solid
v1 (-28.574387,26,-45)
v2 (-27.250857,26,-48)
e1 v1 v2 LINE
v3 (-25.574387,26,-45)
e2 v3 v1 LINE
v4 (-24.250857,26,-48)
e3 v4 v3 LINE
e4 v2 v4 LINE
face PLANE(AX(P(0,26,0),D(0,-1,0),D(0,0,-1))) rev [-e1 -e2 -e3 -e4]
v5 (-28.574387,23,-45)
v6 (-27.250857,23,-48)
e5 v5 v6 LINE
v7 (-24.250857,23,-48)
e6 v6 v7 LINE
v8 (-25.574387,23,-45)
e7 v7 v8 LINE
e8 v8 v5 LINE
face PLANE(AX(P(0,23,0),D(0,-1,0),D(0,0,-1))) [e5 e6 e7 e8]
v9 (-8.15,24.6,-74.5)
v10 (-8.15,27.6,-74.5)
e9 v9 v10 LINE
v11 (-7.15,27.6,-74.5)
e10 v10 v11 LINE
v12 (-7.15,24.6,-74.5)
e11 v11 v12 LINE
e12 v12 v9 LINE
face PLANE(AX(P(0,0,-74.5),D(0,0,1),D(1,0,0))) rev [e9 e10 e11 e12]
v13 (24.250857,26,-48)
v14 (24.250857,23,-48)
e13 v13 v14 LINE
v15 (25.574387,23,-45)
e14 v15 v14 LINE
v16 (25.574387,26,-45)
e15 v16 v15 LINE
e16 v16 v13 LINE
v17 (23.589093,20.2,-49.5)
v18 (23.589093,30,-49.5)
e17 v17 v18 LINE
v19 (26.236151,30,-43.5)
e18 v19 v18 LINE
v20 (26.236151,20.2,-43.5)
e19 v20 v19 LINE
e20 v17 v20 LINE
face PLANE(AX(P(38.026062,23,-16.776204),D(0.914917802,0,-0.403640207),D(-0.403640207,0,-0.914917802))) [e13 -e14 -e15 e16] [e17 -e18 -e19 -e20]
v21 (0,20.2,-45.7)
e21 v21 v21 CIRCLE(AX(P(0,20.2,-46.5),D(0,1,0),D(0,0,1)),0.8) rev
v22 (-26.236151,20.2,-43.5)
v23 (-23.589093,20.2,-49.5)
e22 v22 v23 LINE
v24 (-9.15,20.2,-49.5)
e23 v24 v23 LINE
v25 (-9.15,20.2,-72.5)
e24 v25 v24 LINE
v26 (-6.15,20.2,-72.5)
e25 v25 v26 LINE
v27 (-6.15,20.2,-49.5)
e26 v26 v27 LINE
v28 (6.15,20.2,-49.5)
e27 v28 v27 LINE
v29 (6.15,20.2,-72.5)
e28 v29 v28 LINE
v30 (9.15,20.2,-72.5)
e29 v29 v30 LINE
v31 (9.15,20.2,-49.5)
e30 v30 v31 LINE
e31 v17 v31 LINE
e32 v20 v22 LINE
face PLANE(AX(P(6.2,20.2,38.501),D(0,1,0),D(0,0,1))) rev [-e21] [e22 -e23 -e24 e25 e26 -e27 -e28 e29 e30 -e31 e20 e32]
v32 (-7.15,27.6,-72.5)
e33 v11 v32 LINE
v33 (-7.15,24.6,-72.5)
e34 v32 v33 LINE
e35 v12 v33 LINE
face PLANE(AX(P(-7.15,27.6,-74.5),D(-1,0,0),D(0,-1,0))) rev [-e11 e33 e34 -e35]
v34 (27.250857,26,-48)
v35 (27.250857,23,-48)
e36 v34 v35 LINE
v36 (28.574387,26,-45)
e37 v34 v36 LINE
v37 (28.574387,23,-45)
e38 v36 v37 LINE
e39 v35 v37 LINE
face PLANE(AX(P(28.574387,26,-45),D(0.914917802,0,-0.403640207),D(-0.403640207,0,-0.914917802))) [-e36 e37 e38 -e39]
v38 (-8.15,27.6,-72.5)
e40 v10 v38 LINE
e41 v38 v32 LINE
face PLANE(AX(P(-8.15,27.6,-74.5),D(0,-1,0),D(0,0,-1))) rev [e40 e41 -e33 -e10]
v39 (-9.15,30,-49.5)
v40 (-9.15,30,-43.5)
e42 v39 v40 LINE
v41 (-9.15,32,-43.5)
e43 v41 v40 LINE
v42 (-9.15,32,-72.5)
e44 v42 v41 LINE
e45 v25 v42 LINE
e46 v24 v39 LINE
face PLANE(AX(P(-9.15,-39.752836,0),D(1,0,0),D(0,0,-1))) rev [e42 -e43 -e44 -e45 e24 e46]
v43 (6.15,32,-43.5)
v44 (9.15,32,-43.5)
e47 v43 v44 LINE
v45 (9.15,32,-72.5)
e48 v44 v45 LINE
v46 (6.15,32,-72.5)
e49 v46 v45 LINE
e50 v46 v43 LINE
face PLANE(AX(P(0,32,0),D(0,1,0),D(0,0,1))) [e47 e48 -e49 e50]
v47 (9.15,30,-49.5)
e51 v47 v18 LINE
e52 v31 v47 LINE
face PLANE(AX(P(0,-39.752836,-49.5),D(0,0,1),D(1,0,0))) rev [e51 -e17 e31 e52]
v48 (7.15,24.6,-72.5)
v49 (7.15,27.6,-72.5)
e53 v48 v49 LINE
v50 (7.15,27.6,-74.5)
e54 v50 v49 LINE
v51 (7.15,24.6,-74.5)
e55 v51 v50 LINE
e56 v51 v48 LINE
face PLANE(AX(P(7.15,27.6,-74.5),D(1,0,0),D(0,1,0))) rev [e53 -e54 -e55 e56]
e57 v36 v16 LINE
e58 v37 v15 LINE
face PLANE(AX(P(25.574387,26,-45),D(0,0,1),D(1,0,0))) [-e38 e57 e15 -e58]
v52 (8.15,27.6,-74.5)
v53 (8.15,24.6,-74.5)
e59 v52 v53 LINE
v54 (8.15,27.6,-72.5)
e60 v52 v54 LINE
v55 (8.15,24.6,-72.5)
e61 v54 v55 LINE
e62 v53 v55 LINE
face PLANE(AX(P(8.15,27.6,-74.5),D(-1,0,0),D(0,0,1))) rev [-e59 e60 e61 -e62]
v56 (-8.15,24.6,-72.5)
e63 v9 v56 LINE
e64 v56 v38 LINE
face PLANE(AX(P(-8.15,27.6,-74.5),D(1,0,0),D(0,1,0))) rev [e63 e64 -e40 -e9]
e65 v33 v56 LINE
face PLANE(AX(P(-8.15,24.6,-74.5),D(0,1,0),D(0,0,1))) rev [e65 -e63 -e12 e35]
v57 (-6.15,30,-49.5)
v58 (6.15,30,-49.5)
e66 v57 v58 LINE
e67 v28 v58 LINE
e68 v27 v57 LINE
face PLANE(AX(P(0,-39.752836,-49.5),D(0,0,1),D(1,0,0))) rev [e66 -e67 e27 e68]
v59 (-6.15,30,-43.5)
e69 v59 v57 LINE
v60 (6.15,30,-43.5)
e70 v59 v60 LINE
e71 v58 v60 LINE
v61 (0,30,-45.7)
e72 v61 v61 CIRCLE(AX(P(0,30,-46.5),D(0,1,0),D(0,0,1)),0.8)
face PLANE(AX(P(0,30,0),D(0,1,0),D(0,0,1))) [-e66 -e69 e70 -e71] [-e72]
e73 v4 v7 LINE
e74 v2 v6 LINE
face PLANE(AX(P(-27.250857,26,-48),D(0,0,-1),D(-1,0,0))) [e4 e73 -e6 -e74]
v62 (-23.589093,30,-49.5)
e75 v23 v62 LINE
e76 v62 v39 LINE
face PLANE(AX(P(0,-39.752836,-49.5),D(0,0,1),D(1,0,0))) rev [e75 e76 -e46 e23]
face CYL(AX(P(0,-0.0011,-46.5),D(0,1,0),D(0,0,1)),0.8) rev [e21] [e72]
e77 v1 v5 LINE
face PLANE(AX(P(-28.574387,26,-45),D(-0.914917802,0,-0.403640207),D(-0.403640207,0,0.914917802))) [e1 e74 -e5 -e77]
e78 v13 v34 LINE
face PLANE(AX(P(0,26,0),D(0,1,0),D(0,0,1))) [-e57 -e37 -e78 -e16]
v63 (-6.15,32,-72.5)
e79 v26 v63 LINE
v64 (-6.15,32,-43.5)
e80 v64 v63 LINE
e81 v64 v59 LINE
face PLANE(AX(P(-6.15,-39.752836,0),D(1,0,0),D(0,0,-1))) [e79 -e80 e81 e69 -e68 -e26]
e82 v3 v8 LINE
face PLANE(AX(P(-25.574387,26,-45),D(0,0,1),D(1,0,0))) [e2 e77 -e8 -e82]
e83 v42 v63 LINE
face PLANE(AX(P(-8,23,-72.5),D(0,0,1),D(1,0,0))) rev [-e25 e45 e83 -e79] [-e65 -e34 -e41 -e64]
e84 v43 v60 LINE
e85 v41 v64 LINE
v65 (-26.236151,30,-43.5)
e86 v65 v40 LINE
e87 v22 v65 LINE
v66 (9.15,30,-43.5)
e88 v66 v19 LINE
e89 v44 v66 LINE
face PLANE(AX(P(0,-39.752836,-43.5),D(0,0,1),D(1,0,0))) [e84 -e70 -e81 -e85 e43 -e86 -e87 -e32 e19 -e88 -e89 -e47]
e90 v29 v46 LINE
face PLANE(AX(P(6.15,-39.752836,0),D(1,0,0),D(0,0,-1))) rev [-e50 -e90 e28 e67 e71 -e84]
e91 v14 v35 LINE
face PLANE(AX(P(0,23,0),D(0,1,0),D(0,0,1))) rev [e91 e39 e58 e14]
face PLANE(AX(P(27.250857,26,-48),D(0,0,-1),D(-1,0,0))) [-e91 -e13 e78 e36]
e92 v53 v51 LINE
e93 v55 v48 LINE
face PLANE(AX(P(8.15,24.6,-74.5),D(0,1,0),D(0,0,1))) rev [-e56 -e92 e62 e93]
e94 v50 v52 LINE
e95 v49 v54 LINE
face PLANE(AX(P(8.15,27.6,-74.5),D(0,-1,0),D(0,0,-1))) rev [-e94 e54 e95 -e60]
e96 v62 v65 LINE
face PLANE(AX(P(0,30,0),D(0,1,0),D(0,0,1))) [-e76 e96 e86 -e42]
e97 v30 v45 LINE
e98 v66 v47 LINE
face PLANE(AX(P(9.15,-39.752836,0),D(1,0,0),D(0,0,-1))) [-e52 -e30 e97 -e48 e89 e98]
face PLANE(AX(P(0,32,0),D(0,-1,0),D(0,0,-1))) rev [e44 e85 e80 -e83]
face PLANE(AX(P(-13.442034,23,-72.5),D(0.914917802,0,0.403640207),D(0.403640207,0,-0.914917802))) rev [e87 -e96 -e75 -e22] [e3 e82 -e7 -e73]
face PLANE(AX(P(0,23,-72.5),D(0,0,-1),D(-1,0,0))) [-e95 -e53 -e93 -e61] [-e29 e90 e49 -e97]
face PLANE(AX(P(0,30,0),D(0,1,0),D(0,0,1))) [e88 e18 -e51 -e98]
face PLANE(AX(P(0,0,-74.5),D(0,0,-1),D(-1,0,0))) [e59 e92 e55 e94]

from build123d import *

# Parameters (mm, degrees)
SKETCH1_W                = 58
SKETCH1_H                = 65
BOSS_EXTRUDE1_DEPTH      = 30
BOSS_EXTRUDE3_REACH      = 92.09
SKETCH10_W               = 5
SKETCH10_H               = 14
CUT_EXTRUDE1_REACH       = 111.372
SKETCH2_R                = 2.45
SKETCH2_R_2              = 2.55
CUT_EXTRUDE2_REACH       = 91.744
SKETCH3_W                = 12.4
SKETCH3_H                = 10.4
SKETCH11_W               = 3
SKETCH11_H               = 2
BOSS_EXTRUDE4_DEPTH      = 6.3
FILLET3_R                = 1.5
SKETCH12_R               = 0.5
CUT_EXTRUDE3_DEPTH       = 92.15338732
FILLET3_OF_MIRROR1_R     = 1.5
BOSS_EXTRUDE5_REACH      = 111.564
SKETCH13_W               = 15
SKETCH13_H               = 6
BOSS_EXTRUDE6_REACH      = 111.564
SKETCH17_W               = 15
SKETCH17_H               = 14
CUT_EXTRUDE18_REACH      = 129.651
SKETCH35_W               = 16
SKETCH35_H               = 6
FILLET5_R                = 3
BOSS_EXTRUDE7_START      = 20.2
BOSS_EXTRUDE7_DEPTH      = 9.8
BOSS_EXTRUDE8_DEPTH      = 20
CUT_EXTRUDE15_REACH      = 95.637
SKETCH28_R               = 0.8
FILLET4_R                = 3
CUT_EXTRUDE16_REACH      = 96.767
SKETCH29_R               = 1.6
SKETCH30_W               = 14
SKETCH30_H               = 1.5
BOSS_EXTRUDE9_DEPTH      = 6.1
SKETCH31_W               = 1.3
SKETCH31_H               = 14
BOSS_EXTRUDE10_DEPTH     = 5
CUT_EXTRUDE17_REACH      = 99.736
FILLET11_R               = 1
FILLET11_OF_MIRROR4_R    = 1
MIRROR5_START            = 2.5
MIRROR5_OUTLINE_W        = 1.5
MIRROR5_OUTLINE_H        = 14
MIRROR5_DEPTH            = 6.1
MIRROR5_START_2          = 7.3
MIRROR5_2_DEPTH          = 1.3
SKETCH36_W               = 22.4
SKETCH36_H               = 14.8
BOSS_EXTRUDE12_DEPTH     = 14
CUT_EXTRUDE19_DEPTH      = 3
CUT_EXTRUDE20_DEPTH      = 11
CUT_EXTRUDE21_REACH      = 101.088
SKETCH41_W               = 3
SKETCH41_H               = 35
BOSS_EXTRUDE13_DEPTH     = 2
BOSS_EXTRUDE14_START     = -1.789079
SKETCH43_W               = 36.284482562
SKETCH43_H               = 9.6
BOSS_EXTRUDE14_DEPTH     = 66.789079
BOSS_EXTRUDE15_REACH     = 152.996
SKETCH44_W               = 2.842240903
SKETCH44_H               = 50
FILLET6_R                = 8
FILLET7_R                = 5
SKETCH45_W               = 17
SKETCH45_H               = 8
CUT_EXTRUDE22_DEPTH      = 166.644015889
BOSS_EXTRUDE16_REACH     = 152.29
SKETCH46_W               = 4.5
SKETCH46_H               = 5
BOSS_EXTRUDE17_REACH     = 154.715
SKETCH49_W               = 8
SKETCH49_H               = 9
CUT_EXTRUDE23_DEPTH      = 8
SKETCH50_R               = 2.45
CUT_EXTRUDE24_DEPTH      = 4.5
CUT_EXTRUDE25_START      = 13.5
SKETCH51_R               = 2.45
CUT_EXTRUDE25_DEPTH      = 4.5
BOSS_EXTRUDE18_REACH     = 165.708
SKETCH53_W               = 5
SKETCH53_H               = 10
SKETCH55_W               = 58
SKETCH55_H               = 10
BOSS_EXTRUDE20_DEPTH     = 4
CUT_EXTRUDE9_START       = -10
SKETCH19_W               = 30
SKETCH19_H               = 15
CUT_EXTRUDE9_DEPTH       = 10
SKETCH58_W               = 70
SKETCH58_H               = 9
CUT_EXTRUDE27_DEPTH      = 153.77843439
BOSS_EXTRUDE22_REACH     = 153.411
SKETCH59_W               = 30
SKETCH59_H               = 5
CUT_EXTRUDE28_REACH      = 183.113
SKETCH18_R               = 1.5
FILLET9_R                = 2
FILLET10_R               = 1
SKETCH60_W               = 70
SKETCH60_H               = 3
BOSS_EXTRUDE23_DEPTH     = 30
CUT_EXTRUDE29_DEPTH      = 7.5
CUT_EXTRUDE30_DEPTH      = 3
SKETCH64_W               = 58
SKETCH64_H               = 4
BOSS_EXTRUDE24_DEPTH     = 6
CUT_EXTRUDE31_DEPTH      = 7.5
CUT_EXTRUDE32_DEPTH      = 153.77843439
SKETCH66_W               = 26.284482562
SKETCH66_H               = 4.8
BOSS_EXTRUDE25_DEPTH     = 10
SKETCH73_W               = 121.646596119
SKETCH73_H               = 145.231140265
CUT_EXTRUDE33_DEPTH      = 16
CUT_EXTRUDE34_DEPTH      = 4
CUT_EXTRUDE35_DEPTH      = 6.5
CUT_EXTRUDE36_DEPTH      = 7
SKETCH79_W               = 43.755200993
SKETCH79_H               = 6.87148653
CUT_EXTRUDE37_DEPTH      = 2
CUT_EXTRUDE38_DEPTH      = 2.4
CUT_EXTRUDE39_DEPTH      = 108.707547785
CUT_EXTRUDE39_DEPTH_BACK = 108.707547785
SKETCH81_W               = 95.744118352
SKETCH81_H               = 138.331599567
BOSS_EXTRUDE26_START     = -2.8
BOSS_EXTRUDE26_DEPTH     = 3
SKETCH83_W               = 1
SKETCH83_H               = 3
BOSS_EXTRUDE27_DEPTH     = 2


# Read off the part's stored shape, not the designer's step: Mirror5
# Some blends are built 0.0001 mm under size
with BuildPart() as part:
    # Sketch1 → Boss-Extrude1 (new body)
    with BuildSketch(Plane(origin=(0, 0, 0), x_dir=(1, 0, 0), z_dir=(0, 1, 0))):
        Polygon((-35, 38.5), (-17.352941176, 78.5), (17.352941947, 78.5), (35, 38.5), (35, -38.5), (-35, -38.5), align=None)
        Rectangle(SKETCH1_W, SKETCH1_H, mode=Mode.SUBTRACT)
        Polygon((-28.44203382, 38.5), (28.442033867, 38.5), (13.442034522, 72.5), (-13.44203382, 72.5), align=None, mode=Mode.SUBTRACT)
    extrude(amount=BOSS_EXTRUDE1_DEPTH)

    # Sketch7 → Loft3 section 0
    with BuildSketch(Plane.XY.offset(-32.5)):
        with BuildLine():
            Line((-8.6, 30), (8.6, 30))
            Line((8.6, 30), (8.6, 27))
            Line((8.6, 27), (-8.6, 27))
            Line((-8.6, 27), (-8.6, 30))
        make_face()
    # Sketch8 → Loft3 section 1
    with BuildSketch(Plane.XY.offset(38.5)):
        with BuildLine():
            Line((-8.6, 30), (8.6, 30))
            Line((8.6, 30), (8.6, 27))
            Line((8.6, 27), (-8.6, 27))
            Line((-8.6, 27), (-8.6, 30))
        make_face()
    loft3 = loft()

    # Mirror3: Loft3 across plane
    add(loft3.mirror(Plane(origin=(0, 15, 0), x_dir=(0, 0, 1), z_dir=(0, -1, 0))))

    # Sketch10 → Boss-Extrude3 (add, up to next)
    with BuildSketch(Plane.XZ.offset(-27), mode=Mode.PRIVATE) as boss_extrude3_sk1:
        with Locations((0, 2.5)):
            Rectangle(SKETCH10_W, SKETCH10_H)
    boss_extrude3_tool1 = extrude(boss_extrude3_sk1.sketch, amount=BOSS_EXTRUDE3_REACH, mode=Mode.PRIVATE) - part.part
    add(boss_extrude3_tool1.solids().sort_by_distance((0, 27, 2.5))[0])

    # Sketch2 → Cut-Extrude1 (cut, up to next)
    with BuildSketch(Plane(origin=(35, 0, 0), x_dir=(0, 0, -1), z_dir=(1, 0, 0)), mode=Mode.PRIVATE) as cut_extrude1_sk1:
        with Locations((-2.5, 15)):
            Circle(SKETCH2_R)
    cut_extrude1_tool1 = extrude(cut_extrude1_sk1.sketch, amount=-CUT_EXTRUDE1_REACH, mode=Mode.PRIVATE) & part.part
    # Sketch2 → Cut-Extrude1 (cut, up to next)
    with BuildSketch(Plane(origin=(35, 0, 0), x_dir=(0, 0, -1), z_dir=(1, 0, 0)), mode=Mode.PRIVATE) as cut_extrude1_sk2:
        with Locations((19.5, 15)):
            Circle(SKETCH2_R_2)
    cut_extrude1_tool2 = extrude(cut_extrude1_sk2.sketch, amount=-CUT_EXTRUDE1_REACH, mode=Mode.PRIVATE) & part.part
    cut_extrude1_1 = cut_extrude1_tool1.solids().sort_by_distance((35, 15, 2.5))[0]
    add(cut_extrude1_1, mode=Mode.SUBTRACT)
    cut_extrude1_2 = cut_extrude1_tool2.solids().sort_by_distance((35, 15, -19.5))[0]
    add(cut_extrude1_2, mode=Mode.SUBTRACT)
    cut_extrude1 = cut_extrude1_1 + cut_extrude1_2  # Cut-Extrude1 as one shape, for the pattern or mirror that repeats it

    # Sketch3 → Cut-Extrude2 (cut, up to next)
    with BuildSketch(Plane(origin=(0, 0, -38.5), x_dir=(-1, 0, 0), z_dir=(0, 0, -1)), mode=Mode.PRIVATE) as cut_extrude2_sk1:
        with Locations((0, 15)):
            Rectangle(SKETCH3_W, SKETCH3_H)
    cut_extrude2_tool1 = extrude(cut_extrude2_sk1.sketch, amount=-CUT_EXTRUDE2_REACH, mode=Mode.PRIVATE) & part.part
    add(cut_extrude2_tool1.solids().sort_by_distance((0, 15, -38.5))[0], mode=Mode.SUBTRACT)

    # Sketch11 → Boss-Extrude4 (add)
    with BuildSketch(Plane(origin=(35, 0, 0), x_dir=(0, 0, -1), z_dir=(1, 0, 0))):
        with Locations((2.5, 20)):
            Rectangle(SKETCH11_W, SKETCH11_H)
        with Locations((2.5, 10)):
            Rectangle(SKETCH11_W, SKETCH11_H)
    boss_extrude4 = extrude(amount=BOSS_EXTRUDE4_DEPTH)

    # Fillet3
    fillet3_edges = [part.edges().sort_by_distance(p)[0] for p in [
        (41.3, 10, -1),
        (41.3, 10, -4),
        (41.3, 20, -1),
        (41.3, 20, -4),
    ]]
    fillet(fillet3_edges, radius=FILLET3_R - 0.0001)  # a hair under: the kernel refuses the full size

    # Sketch12 → Cut-Extrude3 (cut, through all)
    with BuildSketch(Plane(origin=(0, 21, 0), x_dir=(1, 0, 0), z_dir=(0, 1, 0))):
        with Locations(Location((39.8, 2.5, 0), (0, 0, 270))):
            Circle(SKETCH12_R)
    cut_extrude3 = extrude(amount=-CUT_EXTRUDE3_DEPTH, mode=Mode.SUBTRACT)

    # Mirror1: Cut-Extrude1, Boss-Extrude4, Cut-Extrude3 across plane
    add(cut_extrude1.mirror(Plane(origin=(0, 0, 0), x_dir=(0, 0, 1), z_dir=(1, 0, 0))), mode=Mode.SUBTRACT)
    add(boss_extrude4.mirror(Plane(origin=(0, 0, 0), x_dir=(0, 0, 1), z_dir=(1, 0, 0))))
    add(cut_extrude3.mirror(Plane(origin=(0, 0, 0), x_dir=(0, 0, 1), z_dir=(1, 0, 0))), mode=Mode.SUBTRACT)

    # Fillet3 of Mirror1
    fillet3_of_mirror1_edges = [part.edges().sort_by_distance(p)[0] for p in [
        (-41.3, 10, -1),
        (-41.3, 10, -4),
        (-41.3, 20, -1),
        (-41.3, 20, -4),
    ]]
    fillet(fillet3_of_mirror1_edges, radius=FILLET3_OF_MIRROR1_R - 0.0001)  # a hair under: the kernel refuses the full size

    # Sketch13 → Boss-Extrude5 (add, up to next)
    with BuildSketch(Plane(origin=(-29, 0, 0), x_dir=(0, 0, -1), z_dir=(1, 0, 0)), mode=Mode.PRIVATE) as boss_extrude5_sk1:
        with Locations((-25, 27)):
            Rectangle(SKETCH13_W, SKETCH13_H)
    boss_extrude5_tool1 = extrude(boss_extrude5_sk1.sketch, amount=BOSS_EXTRUDE5_REACH, mode=Mode.PRIVATE) - part.part
    add(boss_extrude5_tool1.solids().sort_by_distance((-29, 27, 25))[0])

    # Sketch17 → Boss-Extrude6 (add, up to next)
    with BuildSketch(Plane(origin=(-29, 0, 0), x_dir=(0, 0, -1), z_dir=(1, 0, 0)), mode=Mode.PRIVATE) as boss_extrude6_sk1:
        with Locations((-25, 7)):
            Rectangle(SKETCH17_W, SKETCH17_H)
    boss_extrude6_tool1 = extrude(boss_extrude6_sk1.sketch, amount=BOSS_EXTRUDE6_REACH, mode=Mode.PRIVATE) - part.part
    add(boss_extrude6_tool1.solids().sort_by_distance((-29, 7, 25))[0])

    # Sketch35 → Cut-Extrude18 (cut, up to next)
    with BuildSketch(Plane(origin=(0, 0, -78.5), x_dir=(-1, 0, 0), z_dir=(0, 0, -1)), mode=Mode.PRIVATE) as cut_extrude18_sk1:
        with Locations((0, 15)):
            Rectangle(SKETCH35_W, SKETCH35_H)
    cut_extrude18_tool1 = extrude(cut_extrude18_sk1.sketch, amount=-CUT_EXTRUDE18_REACH, mode=Mode.PRIVATE) & part.part
    add(cut_extrude18_tool1.solids().sort_by_distance((0, 15, -78.5))[0], mode=Mode.SUBTRACT)

    # Fillet5
    fillet5_edges = [part.edges().sort_by_distance(p)[0] for p in [
        (-35, 15, -38.5),
        (-17.352941176, 15, -78.5),
        (17.352941947, 15, -78.5),
        (35, 15, -38.5),
        (-8, 15, -78.5),
        (8, 15, -78.5),
    ]]
    fillet(fillet5_edges, radius=FILLET5_R)

    # Sketch24 → Boss-Extrude7 (add)
    with BuildSketch(Plane(origin=(0, 0, 0), x_dir=(1, 0, 0), z_dir=(0, 1, 0)).offset(BOSS_EXTRUDE7_START)):
        Polygon((9.15, 49.5), (9.15, 72.5), (6.15, 72.5), (6.15, 49.5), (-6.15, 49.5), (-6.15, 72.5), (-9.15, 72.5), (-9.15, 49.5), (-23.589092644, 49.5), (-26.23615161, 43.5), (26.23615161, 43.5), (23.589092902, 49.5), align=None)
    extrude(amount=BOSS_EXTRUDE7_DEPTH)

    # Sketch26 → Boss-Extrude8 (add)
    with BuildSketch(Plane(origin=(0, 0, -38.5), x_dir=(-1, 0, 0), z_dir=(0, 0, -1))):
        Polygon((-11.2, 4.8), (-11.2, 0), (11.2, 0), (11.2, 4.8), (11.2, 14.8), (6.2, 14.8), (6.2, 9.8), (-6.2, 9.8), (-6.2, 14.8), (-11.2, 14.8), align=None)
    extrude(amount=BOSS_EXTRUDE8_DEPTH)

    # Sketch28 → Cut-Extrude15 (cut, up to next)
    with BuildSketch(Plane(origin=(0, 30, 0), x_dir=(-1, 0, 0), z_dir=(0, 1, 0)), mode=Mode.PRIVATE) as cut_extrude15_sk1:
        with Locations(Location((0, -46.5, 0), (0, 0, 90))):
            Circle(SKETCH28_R)
    cut_extrude15_tool1 = extrude(cut_extrude15_sk1.sketch, amount=-CUT_EXTRUDE15_REACH, mode=Mode.PRIVATE) & part.part
    # Sketch28 → Cut-Extrude15 (cut, up to next)
    with BuildSketch(Plane(origin=(0, 30, 0), x_dir=(-1, 0, 0), z_dir=(0, 1, 0)), mode=Mode.PRIVATE) as cut_extrude15_sk2:
        with Locations(Location((0, -75.5, 0), (0, 0, 90))):
            Circle(SKETCH28_R)
    cut_extrude15_tool2 = extrude(cut_extrude15_sk2.sketch, amount=-CUT_EXTRUDE15_REACH, mode=Mode.PRIVATE) & part.part
    add(cut_extrude15_tool1.solids().sort_by_distance((0, 30, -46.5))[0], mode=Mode.SUBTRACT)
    add(cut_extrude15_tool2.solids().sort_by_distance((0, 30, -75.5))[0], mode=Mode.SUBTRACT)

    # Fillet4
    fillet4_edges = [part.edges().sort_by_distance(p)[0] for p in [
        (35, 19, -2.5),
        (35, 20, -4),
        (35, 21, -2.5),
        (35, 11, -2.5),
        (35, 9, -2.5),
        (35, 10, -4),
        (-35, 19, -2.5),
        (-35, 20, -4),
        (-35, 21, -2.5),
        (-35, 11, -2.5),
        (-35, 9, -2.5),
        (-35, 10, -4),
    ]]
    fillet(fillet4_edges, radius=FILLET4_R)

    # Sketch29 → Cut-Extrude16 (cut, up to next)
    with BuildSketch(Plane(origin=(2.5, 0, 0), x_dir=(0, 0, -1), z_dir=(1, 0, 0)), mode=Mode.PRIVATE) as cut_extrude16_sk1:
        with Locations(Location((-2.5, 15, 0), (0, 0, 90))):
            Circle(SKETCH29_R)
    cut_extrude16_tool1 = extrude(cut_extrude16_sk1.sketch, amount=-CUT_EXTRUDE16_REACH, mode=Mode.PRIVATE) & part.part
    add(cut_extrude16_tool1.solids().sort_by_distance((2.5, 15, 2.5))[0], mode=Mode.SUBTRACT)

    # Sketch30 → Boss-Extrude9 (add)
    with BuildSketch(Plane.ZY.offset(2.5)):
        with Locations((2.5, 26.25)):
            Rectangle(SKETCH30_W, SKETCH30_H)
    boss_extrude9 = extrude(amount=BOSS_EXTRUDE9_DEPTH)

    # Sketch31 → Boss-Extrude10 (add)
    with BuildSketch(Plane.XZ.offset(-25.5)):
        with Locations((-7.95, 2.5)):
            Rectangle(SKETCH31_W, SKETCH31_H)
    boss_extrude10 = extrude(amount=BOSS_EXTRUDE10_DEPTH)

    # Sketch32 → Cut-Extrude17 (cut, up to next)
    with BuildSketch(Plane.ZY.offset(8.6), mode=Mode.PRIVATE) as cut_extrude17_sk1:
        with BuildLine():
            Line((-4.5, 20.5), (-4.5, 20.656854249))
            ThreePointArc((-4.5, 20.656854249), (2.5, 24), (9.5, 20.656854249))
            Line((9.5, 20.656854249), (9.5, 20.5))
            Line((9.5, 20.5), (-4.5, 20.5))
        make_face()
    cut_extrude17_tool1 = extrude(cut_extrude17_sk1.sketch, amount=-CUT_EXTRUDE17_REACH, mode=Mode.PRIVATE) & part.part
    cut_extrude17 = cut_extrude17_tool1.solids().sort_by_distance((-8.6, 21.927092, 2.5))[0]
    add(cut_extrude17, mode=Mode.SUBTRACT)

    # Fillet11
    fillet11_edges = [part.edges().sort_by_distance(p)[0] for p in [
        (-7.95, 20.656854249, 9.5),
        (-7.95, 20.656854249, -4.5),
    ]]
    fillet(fillet11_edges, radius=FILLET11_R)

    # Mirror4: Boss-Extrude9, Boss-Extrude10, Cut-Extrude17 across plane
    add(boss_extrude9.mirror(Plane(origin=(0, 15, 0), x_dir=(0, 0, 1), z_dir=(0, -1, 0))))
    add(boss_extrude10.mirror(Plane(origin=(0, 15, 0), x_dir=(0, 0, 1), z_dir=(0, -1, 0))))
    add(cut_extrude17.mirror(Plane(origin=(0, 15, 0), x_dir=(0, 0, 1), z_dir=(0, -1, 0))), mode=Mode.SUBTRACT)

    # Fillet11 of Mirror4
    fillet11_of_mirror4_edges = [part.edges().sort_by_distance(p)[0] for p in [
        (-7.95, 9.343145751, 9.5),
        (-7.95, 9.343145751, -4.5),
    ]]
    fillet(fillet11_of_mirror4_edges, radius=FILLET11_OF_MIRROR4_R)

    # Mirror5 outline → Mirror5 (add)
    with BuildSketch(Plane.YZ.offset(MIRROR5_START)):
        with Locations((3.75, 2.5)):
            Rectangle(MIRROR5_OUTLINE_W, MIRROR5_OUTLINE_H)
        with Locations((26.25, 2.5)):
            Rectangle(MIRROR5_OUTLINE_W, MIRROR5_OUTLINE_H)
    extrude(amount=MIRROR5_DEPTH)

    # Mirror5 2 outline → Mirror5 2 (add)
    with BuildSketch(Plane.YZ.offset(MIRROR5_START_2)):
        with BuildLine():
            Line((7, 9.5), (4.5, 9.5))
            Line((4.5, 9.5), (4.5, -4.5))
            Line((4.5, -4.5), (7, -4.5))
            ThreePointArc((7, -4.5), (7.894427191, -3.947213595), (7.8, -2.9))
            ThreePointArc((7.8, -2.9), (6, 2.5), (7.8, 7.9))
            ThreePointArc((7.8, 7.9), (7.894427191, 8.947213595), (7, 9.5))
        make_face()
        with BuildLine():
            Line((25.5, 9.5), (23, 9.5))
            ThreePointArc((23, 9.5), (22.105572809, 8.947213595), (22.2, 7.9))
            ThreePointArc((22.2, 7.9), (24, 2.5), (22.2, -2.9))
            ThreePointArc((22.2, -2.9), (22.105572809, -3.947213595), (23, -4.5))
            Line((23, -4.5), (25.5, -4.5))
            Line((25.5, -4.5), (25.5, 9.5))
        make_face()
    extrude(amount=MIRROR5_2_DEPTH)

    # Sketch36 → Boss-Extrude12 (add)
    with BuildSketch(Plane(origin=(0, 0, -58.5), x_dir=(-1, 0, 0), z_dir=(0, 0, -1))):
        with Locations((0, 7.4)):
            Rectangle(SKETCH36_W, SKETCH36_H)
    extrude(amount=BOSS_EXTRUDE12_DEPTH)

    # Sketch37 → Cut-Extrude19 (cut)
    with BuildSketch(Plane.XY.offset(-58.5)):
        with BuildLine():
            Line((-6, 14.8), (6, 14.8))
            ThreePointArc((6, 14.8), (5.340169944, 12.004915028), (3.5, 9.8))
            Line((3.5, 9.8), (-3.5, 9.8))
            ThreePointArc((-3.5, 9.8), (-5.340169944, 12.004915028), (-6, 14.8))
        make_face()
    extrude(amount=-CUT_EXTRUDE19_DEPTH, mode=Mode.SUBTRACT)

    # Sketch38 → Cut-Extrude20 (cut)
    with BuildSketch(Plane.XY.offset(-61.5)):
        with BuildLine():
            Line((-6, 14.8), (6, 14.8))
            ThreePointArc((6, 14.8), (0, 11.8), (-6, 14.8))
        make_face()
    extrude(amount=-CUT_EXTRUDE20_DEPTH, mode=Mode.SUBTRACT)

    # Cut-Extrude21: up to this face of the body (flat: up to its plane)
    cut_extrude21_end = Plane(part.part.faces().sort_by_distance((11.2, 7.4, -55.5))[0])
    # Sketch40 → Cut-Extrude21 (cut, up to the picked face)
    with BuildSketch(Plane.ZY.offset(11.2), mode=Mode.PRIVATE) as cut_extrude21_sk1:
        Polygon((-58.5, 14.8), (-72.5, 14.8), (-72.5, 11.8), align=None)
    cut_extrude21_tool1 = split(extrude(cut_extrude21_sk1.sketch, amount=-CUT_EXTRUDE21_REACH, mode=Mode.PRIVATE), bisect_by=cut_extrude21_end, keep=Keep.BOTH, mode=Mode.PRIVATE)
    add(cut_extrude21_tool1.solids().sort_by(Axis((-11.2, 13.8, -67.833333), (1, 0, 0)))[0], mode=Mode.SUBTRACT)

    # Sketch41 → Boss-Extrude13 (add)
    with BuildSketch(Plane(origin=(0, 30, 0), x_dir=(1, 0, 0), z_dir=(0, 1, 0))):
        with Locations((-7.65, 61)):
            Rectangle(SKETCH41_W, SKETCH41_H)
        with Locations((7.65, 61)):
            Rectangle(SKETCH41_W, SKETCH41_H)
    extrude(amount=BOSS_EXTRUDE13_DEPTH)

    # Sketch43 → Boss-Extrude14 (add)
    with BuildSketch(Plane(origin=(0, 0, -78.5), x_dir=(-1, 0, 0), z_dir=(0, 0, -1)).offset(BOSS_EXTRUDE14_START)):
        with Locations((-3.78e-07, 4.8)):
            Rectangle(SKETCH43_W, SKETCH43_H)
        with Locations((-3.78e-07, 25.2)):
            Rectangle(SKETCH43_W, SKETCH43_H)
    extrude(amount=BOSS_EXTRUDE14_DEPTH)

    # Sketch44 → Boss-Extrude15 (add, up to next)
    with BuildSketch(Plane(origin=(0, 9.6, 0), x_dir=(1, 0, 0), z_dir=(0, 1, 0)), mode=Mode.PRIVATE) as boss_extrude15_sk1:
        with Locations((-16.721120451, 118.5)):
            Rectangle(SKETCH44_W, SKETCH44_H)
    boss_extrude15_tool1 = extrude(boss_extrude15_sk1.sketch, amount=BOSS_EXTRUDE15_REACH, mode=Mode.PRIVATE) - part.part
    # Sketch44 → Boss-Extrude15 (add, up to next)
    with BuildSketch(Plane(origin=(0, 9.6, 0), x_dir=(1, 0, 0), z_dir=(0, 1, 0)), mode=Mode.PRIVATE) as boss_extrude15_sk2:
        Polygon((18.142241659, 143.5), (15.3, 143.5), (15.3, 93.5), (18.142240903, 93.5), align=None)
    boss_extrude15_tool2 = extrude(boss_extrude15_sk2.sketch, amount=BOSS_EXTRUDE15_REACH, mode=Mode.PRIVATE) - part.part
    add(boss_extrude15_tool1.solids().sort_by_distance((-16.72112, 9.6, -118.5))[0])
    add(boss_extrude15_tool2.solids().sort_by_distance((16.721121, 9.6, -118.500001))[0])

    # Fillet6
    fillet6_edges = [part.edges().sort_by_distance(p)[0] for p in [
        (3.78e-07, 0, -143.5),
        (3.78e-07, 30, -143.5),
    ]]
    fillet(fillet6_edges, radius=FILLET6_R)

    # Fillet7
    # the kernel refuses this fillet: 5 mm, written as the material it takes off along each edge
    with BuildSketch(Plane(origin=(18.142241659, 0, -64.210921), x_dir=(-1, 0, 0), z_dir=(0, 0, -1))) as fillet7_piece_1_section:
        with BuildLine():
            CenterArc((FILLET7_R, FILLET7_R), FILLET7_R, 180, 90)
            Line((0, FILLET7_R), (0, 0))
            Line((0, 0), (FILLET7_R, 0))
        make_face()
    fillet7_piece_1 = extrude(amount=71.289079, mode=Mode.PRIVATE)
    fillet7_piece_1 = split(fillet7_piece_1, bisect_by=Plane(origin=(6.655944686, 1.159648817, -102.746528186), z_dir=(0.9149178080838143, 0, -0.4036401918182936)), keep=Keep.TOP, mode=Mode.PRIVATE)
    with BuildSketch(Plane(origin=(18.142241659, 8, -135.5), x_dir=(0, -1, 0), z_dir=(0, 0, 1))) as fillet7_piece_2:
        with BuildLine():
            CenterArc((8 - FILLET7_R, -FILLET7_R), FILLET7_R, 0, 90)
            Line((8 - FILLET7_R, 0), (8, 0))
            Line((8, 0), (8, -FILLET7_R))
        make_face()
    fillet7_piece_2_solid = revolve(axis=Axis((18.142241659, 8, -135.5), (1, 0, 0)), revolution_arc=90, mode=Mode.PRIVATE)
    with BuildSketch(Plane(origin=(18.142241659, 9.6, -143.5), x_dir=(-1, 0, 0), z_dir=(0, 1, 0))) as fillet7_piece_3:
        with BuildLine():
            CenterArc((FILLET7_R * 1.00000001512, FILLET7_R), FILLET7_R, 179.999999134, 90.000000866)
            Line((FILLET7_R * 1.511713279e-08, FILLET7_R * 1.00000001512), (0, 0))
            Line((0, 0), (FILLET7_R * 1.00000001512, 0))
        make_face()
    fillet7_piece_3_solid = extrude(amount=10.8, mode=Mode.PRIVATE)
    with BuildSketch(Plane(origin=(18.142241659, 22, -135.5), x_dir=(0, 1, 0), z_dir=(0, 0, 1))) as fillet7_piece_4:
        with BuildLine():
            CenterArc((8 - FILLET7_R, FILLET7_R), FILLET7_R, 270, 90)
            Line((8 - FILLET7_R, 0), (8, 0))
            Line((8, 0), (8, FILLET7_R))
        make_face()
    fillet7_piece_4_solid = revolve(axis=Axis((18.142241659, 22, -135.5), (-1, 0, 0)), revolution_arc=90, mode=Mode.PRIVATE)
    with BuildSketch(Plane(origin=(-18.142240903, 0, -64.210921), x_dir=(0, 1, 0), z_dir=(0, 0, -1))) as fillet7_piece_5_section:
        with BuildLine():
            CenterArc((FILLET7_R, FILLET7_R), FILLET7_R, 180, 90)
            Line((0, FILLET7_R), (0, 0))
            Line((0, 0), (FILLET7_R, 0))
        make_face()
    fillet7_piece_5 = extrude(amount=71.289079, mode=Mode.PRIVATE)
    fillet7_piece_5 = split(fillet7_piece_5, bisect_by=Plane(origin=(-6.655943611, 1.159648816, -102.746527816), z_dir=(-0.914917801572932, 0, -0.40364020657629374)), keep=Keep.TOP, mode=Mode.PRIVATE)
    with BuildSketch(Plane(origin=(-18.142240903, 8, -135.5), x_dir=(0, -1, 0), z_dir=(0, 0, 1))) as fillet7_piece_6:
        with BuildLine():
            CenterArc((8 - FILLET7_R, FILLET7_R), FILLET7_R, 270, 90)
            Line((8, FILLET7_R), (8, 0))
            Line((8, 0), (8 - FILLET7_R, 0))
        make_face()
    fillet7_piece_6_solid = revolve(axis=Axis((-18.142240903, 8, -135.5), (1, 0, 0)), revolution_arc=90, mode=Mode.PRIVATE)
    with BuildSketch(Plane(origin=(-18.142240903, 22, -143.5), x_dir=(0, 0, 1), z_dir=(0, -1, 0))) as fillet7_piece_7:
        with BuildLine():
            CenterArc((FILLET7_R, -FILLET7_R), FILLET7_R, 90, 90)
            Line((0, -FILLET7_R), (0, 0))
            Line((0, 0), (FILLET7_R, 0))
        make_face()
    fillet7_piece_7_solid = extrude(amount=14, mode=Mode.PRIVATE)
    with BuildSketch(Plane(origin=(-18.142240903, 22, -135.5), x_dir=(0, 1, 0), z_dir=(0, 0, 1))) as fillet7_piece_8:
        with BuildLine():
            CenterArc((8 - FILLET7_R, -FILLET7_R), FILLET7_R, 0, 90)
            Line((8, -FILLET7_R), (8, 0))
            Line((8, 0), (8 - FILLET7_R, 0))
        make_face()
    fillet7_piece_8_solid = revolve(axis=Axis((-18.142240903, 22, -135.5), (-1, 0, 0)), revolution_arc=90, mode=Mode.PRIVATE)
    with BuildSketch(Plane(origin=(18.142241659, 30, -64.210921), x_dir=(-1, 0, 0), z_dir=(0, 0, -1))) as fillet7_piece_9_section:
        with BuildLine():
            CenterArc((FILLET7_R, -FILLET7_R), FILLET7_R, 90, 90)
            Line((0, -FILLET7_R), (0, 0))
            Line((0, 0), (FILLET7_R, 0))
        make_face()
    fillet7_piece_9 = extrude(amount=71.289079, mode=Mode.PRIVATE)
    fillet7_piece_9 = split(fillet7_piece_9, bisect_by=Plane(origin=(6.655944686, 28.840351183, -102.746528186), z_dir=(0.9149178080838143, 0, -0.4036401918182936)), keep=Keep.TOP, mode=Mode.PRIVATE)
    with BuildSketch(Plane(origin=(-18.142240903, 30, -64.210921), x_dir=(1, 0, 0), z_dir=(0, 0, -1))) as fillet7_piece_10_section:
        with BuildLine():
            CenterArc((FILLET7_R, FILLET7_R), FILLET7_R, 180, 90)
            Line((0, FILLET7_R), (0, 0))
            Line((0, 0), (FILLET7_R, 0))
        make_face()
    fillet7_piece_10 = extrude(amount=71.289079, mode=Mode.PRIVATE)
    fillet7_piece_10 = split(fillet7_piece_10, bisect_by=Plane(origin=(-6.655943611, 28.840351184, -102.746527816), z_dir=(-0.914917801572932, 0, -0.40364020657629374)), keep=Keep.TOP, mode=Mode.PRIVATE)
    with BuildSketch(Plane(origin=(18.142241659, 20.4, -143.5), x_dir=(0, 0, 1), z_dir=(0, 1, 0)), Plane(origin=(18.142241659, 9.6, -143.5), x_dir=(-1, 0, 0), z_dir=(0, -1, 0))) as fillet7_piece_11:
        with BuildLine():
            CenterArc((FILLET7_R, -FILLET7_R), FILLET7_R, 90, 90)
            Line((0, -FILLET7_R), (0, 0))
            Line((0, 0), (FILLET7_R, 0))
        make_face()
    fillet7_piece_11_solid = extrude(amount=1.6, mode=Mode.PRIVATE)
    add([fillet7_piece_1, fillet7_piece_2_solid, fillet7_piece_3_solid, fillet7_piece_4_solid, fillet7_piece_5, fillet7_piece_6_solid, fillet7_piece_7_solid, fillet7_piece_8_solid, fillet7_piece_9, fillet7_piece_10, fillet7_piece_11_solid], mode=Mode.SUBTRACT)

    # Sketch45 → Cut-Extrude22 (cut, through all)
    with BuildSketch(Plane(origin=(35, 0, 0), x_dir=(0, 0, -1), z_dir=(1, 0, 0))):
        with Locations((-24, 19)):
            Rectangle(SKETCH45_W, SKETCH45_H)
    extrude(amount=-CUT_EXTRUDE22_DEPTH, mode=Mode.SUBTRACT)

    # Sketch46 → Boss-Extrude16 (add, up to next)
    with BuildSketch(Plane(origin=(0, 15, 0), x_dir=(1, 0, 0), z_dir=(0, 1, 0)), mode=Mode.PRIVATE) as boss_extrude16_sk1:
        with Locations((31.25, -30)):
            Rectangle(SKETCH46_W, SKETCH46_H)
    boss_extrude16_tool1 = extrude(boss_extrude16_sk1.sketch, amount=BOSS_EXTRUDE16_REACH, mode=Mode.PRIVATE) - part.part
    boss_extrude16 = boss_extrude16_tool1.solids().sort_by_distance((31.25, 15, 30))[0]
    add(boss_extrude16)

    # Boss-Extrude17: up to this face of the body (flat: up to its plane)
    boss_extrude17_end = Plane(part.part.faces().sort_by_distance((-6.013146063, 30, -46.5))[0])
    # Sketch48 → Boss-Extrude17 (add, up to the picked face)
    with BuildSketch(Plane.XZ, mode=Mode.PRIVATE) as boss_extrude17_sk1:
        with BuildLine():
            Line((35, 29.5), (39, 29.5))
            ThreePointArc((39, 29.5), (43, 25.5), (39, 21.5))
            Line((39, 21.5), (35, 21.5))
            Line((35, 21.5), (35, 29.5))
        make_face()
    boss_extrude17_tool1 = split(extrude(boss_extrude17_sk1.sketch, amount=-BOSS_EXTRUDE17_REACH, mode=Mode.PRIVATE), bisect_by=boss_extrude17_end, keep=Keep.BOTH, mode=Mode.PRIVATE)
    boss_extrude17 = boss_extrude17_tool1.solids().sort_by(Axis((38.626601, 0, 25.5), (0, 1, 0)))[0]
    add(boss_extrude17)

    # Sketch49 → Cut-Extrude23 (cut)
    with BuildSketch(Plane.XY.offset(29.5)):
        with Locations((39, 19)):
            Rectangle(SKETCH49_W, SKETCH49_H)
    cut_extrude23 = extrude(amount=-CUT_EXTRUDE23_DEPTH, mode=Mode.SUBTRACT)

    # Sketch50 → Cut-Extrude24 (cut)
    with BuildSketch(Plane(origin=(0, 14.5, 0), x_dir=(1, 0, 0), z_dir=(0, 1, 0))):
        with Locations(Location((39, -25.5, 0), (0, 0, 270))):
            Circle(SKETCH50_R)
    cut_extrude24 = extrude(amount=-CUT_EXTRUDE24_DEPTH, mode=Mode.SUBTRACT)

    # Sketch51 → Cut-Extrude25 (cut)
    with BuildSketch(Plane(origin=(0, 14.5, 0), x_dir=(1, 0, 0), z_dir=(0, 1, 0)).offset(CUT_EXTRUDE25_START)):
        with Locations(Location((39, -25.5, 0), (0, 0, 270))):
            Circle(SKETCH51_R)
    cut_extrude25 = extrude(amount=-CUT_EXTRUDE25_DEPTH, mode=Mode.SUBTRACT)

    # Mirror7: Boss-Extrude16, Boss-Extrude17, Cut-Extrude23, Cut-Extrude24, Cut-Extrude25 across plane
    add(boss_extrude16.mirror(Plane(origin=(0, 0, 0), x_dir=(0, 0, 1), z_dir=(1, 0, 0))))
    add(boss_extrude17.mirror(Plane(origin=(0, 0, 0), x_dir=(0, 0, 1), z_dir=(1, 0, 0))))
    add(cut_extrude23.mirror(Plane(origin=(0, 0, 0), x_dir=(0, 0, 1), z_dir=(1, 0, 0))), mode=Mode.SUBTRACT)
    add(cut_extrude24.mirror(Plane(origin=(0, 0, 0), x_dir=(0, 0, 1), z_dir=(1, 0, 0))), mode=Mode.SUBTRACT)
    add(cut_extrude25.mirror(Plane(origin=(0, 0, 0), x_dir=(0, 0, 1), z_dir=(1, 0, 0))), mode=Mode.SUBTRACT)

    # Sketch53 → Boss-Extrude18 (add, up to next)
    with BuildSketch(Plane.ZY.offset(-29), mode=Mode.PRIVATE) as boss_extrude18_sk1:
        with Locations((30, 19)):
            Rectangle(SKETCH53_W, SKETCH53_H)
    boss_extrude18_tool1 = extrude(boss_extrude18_sk1.sketch, amount=BOSS_EXTRUDE18_REACH, mode=Mode.PRIVATE) - part.part
    add(boss_extrude18_tool1.solids().sort_by_distance((29, 19, 30))[0])

    # Sketch55 → Boss-Extrude20 (add)
    with BuildSketch(Plane(origin=(0, 0, 27.5), x_dir=(-1, 0, 0), z_dir=(0, 0, -1))):
        with Locations((0, 19)):
            Rectangle(SKETCH55_W, SKETCH55_H)
    extrude(amount=BOSS_EXTRUDE20_DEPTH)

    # Sketch19 → Cut-Extrude9 (cut)
    with BuildSketch(Plane(origin=(0, 30, 0), x_dir=(1, 0, 0), z_dir=(0, 1, 0)).offset(CUT_EXTRUDE9_START)):
        with Locations((0, -25)):
            Rectangle(SKETCH19_W, SKETCH19_H)
    extrude(amount=-CUT_EXTRUDE9_DEPTH, mode=Mode.SUBTRACT)

    # Sketch58 → Cut-Extrude27 (cut, through all)
    with BuildSketch(Plane(origin=(0, 30, 0), x_dir=(1, 0, 0), z_dir=(0, 1, 0))):
        with Locations((0, -34)):
            Rectangle(SKETCH58_W, SKETCH58_H)
    extrude(amount=-CUT_EXTRUDE27_DEPTH, mode=Mode.SUBTRACT)

    # Sketch59 → Boss-Extrude22 (add, up to next)
    with BuildSketch(Plane(origin=(0, 10, 0), x_dir=(1, 0, 0), z_dir=(0, 1, 0)), mode=Mode.PRIVATE) as boss_extrude22_sk1:
        with Locations((0, -27)):
            Rectangle(SKETCH59_W, SKETCH59_H)
    boss_extrude22_tool1 = extrude(boss_extrude22_sk1.sketch, amount=BOSS_EXTRUDE22_REACH, mode=Mode.PRIVATE) - part.part
    add(boss_extrude22_tool1.solids().sort_by_distance((0, 10, 27))[0])

    # Sketch18 → Cut-Extrude28 (cut, up to next)
    with BuildSketch(Plane.XY.offset(29.5), mode=Mode.PRIVATE) as cut_extrude28_sk1:
        with Locations((7.5, 15)):
            Circle(SKETCH18_R)
    cut_extrude28_tool1 = extrude(cut_extrude28_sk1.sketch, amount=-CUT_EXTRUDE28_REACH, mode=Mode.PRIVATE) & part.part
    # Sketch18 → Cut-Extrude28 (cut, up to next)
    with BuildSketch(Plane.XY.offset(29.5), mode=Mode.PRIVATE) as cut_extrude28_sk2:
        with Locations((-7.5, 15)):
            Circle(SKETCH18_R)
    cut_extrude28_tool2 = extrude(cut_extrude28_sk2.sketch, amount=-CUT_EXTRUDE28_REACH, mode=Mode.PRIVATE) & part.part
    add(cut_extrude28_tool1.solids().sort_by_distance((7.5, 15, 29.5))[0], mode=Mode.SUBTRACT)
    add(cut_extrude28_tool2.solids().sort_by_distance((-7.5, 15, 29.5))[0], mode=Mode.SUBTRACT)

    # Fillet9
    fillet9_edges = [part.edges().sort_by_distance(p)[0] for p in [
        (6, 15, 24.5),
        (-9, 15, 24.5),
    ]]
    fillet(fillet9_edges, radius=FILLET9_R)

    # Fillet10
    fillet10_edges = [part.edges().sort_by_distance(p)[0] for p in [
        (6, 15, 29.5),
        (-9, 15, 29.5),
    ]]
    fillet(fillet10_edges, radius=FILLET10_R)

    # Sketch60 → Boss-Extrude23 (add)
    with BuildSketch(Plane.XZ):
        with Locations((0, 31)):
            Rectangle(SKETCH60_W, SKETCH60_H)
    extrude(amount=-BOSS_EXTRUDE23_DEPTH)

    # Sketch61 → Cut-Extrude29 (cut)
    with BuildSketch(Plane.XZ):
        Polygon((11.5, 32.5), (-11.5, 32.5), (-14.5, 25), (14.5, 25), align=None)
    extrude(amount=-CUT_EXTRUDE29_DEPTH, mode=Mode.SUBTRACT)

    # Sketch62 → Cut-Extrude30 (cut)
    with BuildSketch(Plane.XY.offset(32.5)):
        with BuildLine():
            Line((-7.5, 17.5), (7.5, 17.5))
            ThreePointArc((7.5, 17.5), (10, 15), (7.5, 12.5))
            Line((7.5, 12.5), (-7.5, 12.5))
            ThreePointArc((-7.5, 12.5), (-10, 15), (-7.5, 17.5))
        make_face()
    extrude(amount=-CUT_EXTRUDE30_DEPTH, mode=Mode.SUBTRACT)

    # Sketch64 → Boss-Extrude24 (add)
    with BuildSketch(Plane(origin=(0, 0, 23.5), x_dir=(-1, 0, 0), z_dir=(0, 0, -1))):
        with Locations((0, 22)):
            Rectangle(SKETCH64_W, SKETCH64_H)
    extrude(amount=BOSS_EXTRUDE24_DEPTH)

    # Sketch63 → Cut-Extrude31 (cut)
    with BuildSketch(Plane(origin=(0, 30, 0), x_dir=(1, 0, 0), z_dir=(0, 1, 0))):
        Polygon((-11.5, -32.5), (11.5, -32.5), (14.5, -25), (-14.5, -25), align=None)
    extrude(amount=-CUT_EXTRUDE31_DEPTH, mode=Mode.SUBTRACT)

    # Sketch65 → Cut-Extrude32 (cut, through all)
    with BuildSketch(Plane(origin=(0, 30, 0), x_dir=(1, 0, 0), z_dir=(0, 1, 0))):
        Polygon((-13.142240903, 88.044253953), (13.142241659, 88.044254404), (18.142241659, 76.710920576), (18.142241659, 143.5), (-18.142240903, 143.5), (-18.142240903, 76.71092062), align=None)
    extrude(amount=-CUT_EXTRUDE32_DEPTH, mode=Mode.SUBTRACT)

    # Sketch66 → Boss-Extrude25 (add)
    with BuildSketch(Plane(origin=(-1.51e-06, 0, -88.044254178), x_dir=(-0.9999999999999999, 0, 1.7148916448299635e-08), z_dir=(-1.7148916448299635e-08, 0, -0.9999999999999999))):
        with Locations((-1.888e-06, 27.6)):
            Rectangle(SKETCH66_W, SKETCH66_H)
        with Locations((-1.888e-06, 2.4)):
            Rectangle(SKETCH66_W, SKETCH66_H)
    extrude(amount=BOSS_EXTRUDE25_DEPTH)

    # Sketch73 → Cut-Extrude33 (cut)
    with BuildSketch(Plane.XZ):
        with Locations((0.620645899, -33.237611814)):
            Rectangle(SKETCH73_W, SKETCH73_H)
    extrude(amount=-CUT_EXTRUDE33_DEPTH, mode=Mode.SUBTRACT)

    # Sketch75 → Cut-Extrude34 (cut)
    with BuildSketch(Plane.XZ.offset(-16)):
        Polygon((-2.5, -7), (8.6, -7), (8.6, 23.5), (29, 23.5), (29, 24.5), (8.6, 24.5), (-8.6, 24.5), (-29, 24.5), (-29, 23.5), (-8.6, 23.5), (-8.6, -7), align=None)
    extrude(amount=-CUT_EXTRUDE34_DEPTH, mode=Mode.SUBTRACT)

    # Sketch76 → Cut-Extrude35 (cut)
    with BuildSketch(Plane.XZ.offset(-16)):
        Polygon((-24.977236043, 32.5), (25, 32.5), (25, 24.5), (13.214480845, 24.5), (-24.977236043, 24.5), align=None)
    extrude(amount=-CUT_EXTRUDE35_DEPTH, mode=Mode.SUBTRACT)

    # Sketch78 → Cut-Extrude36 (cut)
    with BuildSketch(Plane.XZ.offset(-16)):
        Polygon((-24.977236043, 32.5), (-35, 32.5), (-35, -1), (-29, -1), (-29, 17.5), (-29, 24.5), (-24.977236043, 24.5), align=None)
        Polygon((-35, -7), (-29, -7), (-29, -32.5), (29, -32.5), (29, -7), (35, -7), (35, -76.71092062), (18.142240903, -76.71092062), (8, -76.71092062), (8, -72.5), (13.44203382, -72.5), (28.44203382, -38.5), (-28.44203382, -38.5), (-13.44203382, -72.5), (-8, -72.5), (-8, -76.71092062), (-18.142240903, -76.71092062), (-35, -76.71092062), align=None)
        Polygon((35, -1), (29, -1), (29, 24.5), (25, 24.5), (24.977236043, 32.5), (35, 32.5), align=None)
    extrude(amount=-CUT_EXTRUDE36_DEPTH, mode=Mode.SUBTRACT)

    # Sketch79 → Cut-Extrude37 (cut)
    with BuildSketch(Plane.XZ.offset(-16)):
        with Locations((0.386040845, -77.09592916)):
            Rectangle(SKETCH79_W, SKETCH79_H)
    extrude(amount=-CUT_EXTRUDE37_DEPTH, mode=Mode.SUBTRACT)

    # Sketch80 → Cut-Extrude38 (cut)
    with BuildSketch(Plane.XZ.offset(-18)):
        Polygon((-11.000000335, -98.04425399), (-11.000000335, -72.5), (-26.779624803, -72.5), (-26.779624803, -98.044253719), align=None)
        Polygon((26.779624803, -72.5), (11.000000335, -72.5), (11.000000335, -98.04425399), (26.779624803, -98.044253719), align=None)
    extrude(amount=-CUT_EXTRUDE38_DEPTH, mode=Mode.SUBTRACT)

    # Sketch81 → Cut-Extrude39 (cut, two sides: drawn at the far end of the back side and taken through both)
    with BuildSketch(Plane.XZ.offset(-20.2).offset(-CUT_EXTRUDE39_DEPTH_BACK)):
        with Locations((0, -31.528697094)):
            Rectangle(SKETCH81_W, SKETCH81_H)
        Polygon((-26.236151467, -43.5), (26.236151467, -43.5), (13.44203382, -72.5), (-13.44203382, -72.5), align=None, mode=Mode.SUBTRACT)
    extrude(amount=CUT_EXTRUDE39_DEPTH + CUT_EXTRUDE39_DEPTH_BACK, mode=Mode.SUBTRACT)

    # Sketch82 → Boss-Extrude26 (add)
    with BuildSketch(Plane.XZ.offset(-20.2).offset(BOSS_EXTRUDE26_START)):
        Polygon((-25.574386761, -45), (-28.574386761, -45), (-27.25085735, -48), (-24.25085735, -48), align=None)
        Polygon((25.574386761, -45), (24.25085735, -48), (27.25085735, -48), (28.574386761, -45), align=None)
    extrude(amount=-BOSS_EXTRUDE26_DEPTH)

    # Sketch83 → Boss-Extrude27 (add)
    with BuildSketch(Plane(origin=(0, 0, -72.5), x_dir=(-1, 0, 0), z_dir=(0, 0, -1))):
        with Locations((-7.65, 26.1)):
            Rectangle(SKETCH83_W, SKETCH83_H)
        with Locations((7.65, 26.1)):
            Rectangle(SKETCH83_W, SKETCH83_H)
    extrude(amount=BOSS_EXTRUDE27_DEPTH)


solid = part.part
